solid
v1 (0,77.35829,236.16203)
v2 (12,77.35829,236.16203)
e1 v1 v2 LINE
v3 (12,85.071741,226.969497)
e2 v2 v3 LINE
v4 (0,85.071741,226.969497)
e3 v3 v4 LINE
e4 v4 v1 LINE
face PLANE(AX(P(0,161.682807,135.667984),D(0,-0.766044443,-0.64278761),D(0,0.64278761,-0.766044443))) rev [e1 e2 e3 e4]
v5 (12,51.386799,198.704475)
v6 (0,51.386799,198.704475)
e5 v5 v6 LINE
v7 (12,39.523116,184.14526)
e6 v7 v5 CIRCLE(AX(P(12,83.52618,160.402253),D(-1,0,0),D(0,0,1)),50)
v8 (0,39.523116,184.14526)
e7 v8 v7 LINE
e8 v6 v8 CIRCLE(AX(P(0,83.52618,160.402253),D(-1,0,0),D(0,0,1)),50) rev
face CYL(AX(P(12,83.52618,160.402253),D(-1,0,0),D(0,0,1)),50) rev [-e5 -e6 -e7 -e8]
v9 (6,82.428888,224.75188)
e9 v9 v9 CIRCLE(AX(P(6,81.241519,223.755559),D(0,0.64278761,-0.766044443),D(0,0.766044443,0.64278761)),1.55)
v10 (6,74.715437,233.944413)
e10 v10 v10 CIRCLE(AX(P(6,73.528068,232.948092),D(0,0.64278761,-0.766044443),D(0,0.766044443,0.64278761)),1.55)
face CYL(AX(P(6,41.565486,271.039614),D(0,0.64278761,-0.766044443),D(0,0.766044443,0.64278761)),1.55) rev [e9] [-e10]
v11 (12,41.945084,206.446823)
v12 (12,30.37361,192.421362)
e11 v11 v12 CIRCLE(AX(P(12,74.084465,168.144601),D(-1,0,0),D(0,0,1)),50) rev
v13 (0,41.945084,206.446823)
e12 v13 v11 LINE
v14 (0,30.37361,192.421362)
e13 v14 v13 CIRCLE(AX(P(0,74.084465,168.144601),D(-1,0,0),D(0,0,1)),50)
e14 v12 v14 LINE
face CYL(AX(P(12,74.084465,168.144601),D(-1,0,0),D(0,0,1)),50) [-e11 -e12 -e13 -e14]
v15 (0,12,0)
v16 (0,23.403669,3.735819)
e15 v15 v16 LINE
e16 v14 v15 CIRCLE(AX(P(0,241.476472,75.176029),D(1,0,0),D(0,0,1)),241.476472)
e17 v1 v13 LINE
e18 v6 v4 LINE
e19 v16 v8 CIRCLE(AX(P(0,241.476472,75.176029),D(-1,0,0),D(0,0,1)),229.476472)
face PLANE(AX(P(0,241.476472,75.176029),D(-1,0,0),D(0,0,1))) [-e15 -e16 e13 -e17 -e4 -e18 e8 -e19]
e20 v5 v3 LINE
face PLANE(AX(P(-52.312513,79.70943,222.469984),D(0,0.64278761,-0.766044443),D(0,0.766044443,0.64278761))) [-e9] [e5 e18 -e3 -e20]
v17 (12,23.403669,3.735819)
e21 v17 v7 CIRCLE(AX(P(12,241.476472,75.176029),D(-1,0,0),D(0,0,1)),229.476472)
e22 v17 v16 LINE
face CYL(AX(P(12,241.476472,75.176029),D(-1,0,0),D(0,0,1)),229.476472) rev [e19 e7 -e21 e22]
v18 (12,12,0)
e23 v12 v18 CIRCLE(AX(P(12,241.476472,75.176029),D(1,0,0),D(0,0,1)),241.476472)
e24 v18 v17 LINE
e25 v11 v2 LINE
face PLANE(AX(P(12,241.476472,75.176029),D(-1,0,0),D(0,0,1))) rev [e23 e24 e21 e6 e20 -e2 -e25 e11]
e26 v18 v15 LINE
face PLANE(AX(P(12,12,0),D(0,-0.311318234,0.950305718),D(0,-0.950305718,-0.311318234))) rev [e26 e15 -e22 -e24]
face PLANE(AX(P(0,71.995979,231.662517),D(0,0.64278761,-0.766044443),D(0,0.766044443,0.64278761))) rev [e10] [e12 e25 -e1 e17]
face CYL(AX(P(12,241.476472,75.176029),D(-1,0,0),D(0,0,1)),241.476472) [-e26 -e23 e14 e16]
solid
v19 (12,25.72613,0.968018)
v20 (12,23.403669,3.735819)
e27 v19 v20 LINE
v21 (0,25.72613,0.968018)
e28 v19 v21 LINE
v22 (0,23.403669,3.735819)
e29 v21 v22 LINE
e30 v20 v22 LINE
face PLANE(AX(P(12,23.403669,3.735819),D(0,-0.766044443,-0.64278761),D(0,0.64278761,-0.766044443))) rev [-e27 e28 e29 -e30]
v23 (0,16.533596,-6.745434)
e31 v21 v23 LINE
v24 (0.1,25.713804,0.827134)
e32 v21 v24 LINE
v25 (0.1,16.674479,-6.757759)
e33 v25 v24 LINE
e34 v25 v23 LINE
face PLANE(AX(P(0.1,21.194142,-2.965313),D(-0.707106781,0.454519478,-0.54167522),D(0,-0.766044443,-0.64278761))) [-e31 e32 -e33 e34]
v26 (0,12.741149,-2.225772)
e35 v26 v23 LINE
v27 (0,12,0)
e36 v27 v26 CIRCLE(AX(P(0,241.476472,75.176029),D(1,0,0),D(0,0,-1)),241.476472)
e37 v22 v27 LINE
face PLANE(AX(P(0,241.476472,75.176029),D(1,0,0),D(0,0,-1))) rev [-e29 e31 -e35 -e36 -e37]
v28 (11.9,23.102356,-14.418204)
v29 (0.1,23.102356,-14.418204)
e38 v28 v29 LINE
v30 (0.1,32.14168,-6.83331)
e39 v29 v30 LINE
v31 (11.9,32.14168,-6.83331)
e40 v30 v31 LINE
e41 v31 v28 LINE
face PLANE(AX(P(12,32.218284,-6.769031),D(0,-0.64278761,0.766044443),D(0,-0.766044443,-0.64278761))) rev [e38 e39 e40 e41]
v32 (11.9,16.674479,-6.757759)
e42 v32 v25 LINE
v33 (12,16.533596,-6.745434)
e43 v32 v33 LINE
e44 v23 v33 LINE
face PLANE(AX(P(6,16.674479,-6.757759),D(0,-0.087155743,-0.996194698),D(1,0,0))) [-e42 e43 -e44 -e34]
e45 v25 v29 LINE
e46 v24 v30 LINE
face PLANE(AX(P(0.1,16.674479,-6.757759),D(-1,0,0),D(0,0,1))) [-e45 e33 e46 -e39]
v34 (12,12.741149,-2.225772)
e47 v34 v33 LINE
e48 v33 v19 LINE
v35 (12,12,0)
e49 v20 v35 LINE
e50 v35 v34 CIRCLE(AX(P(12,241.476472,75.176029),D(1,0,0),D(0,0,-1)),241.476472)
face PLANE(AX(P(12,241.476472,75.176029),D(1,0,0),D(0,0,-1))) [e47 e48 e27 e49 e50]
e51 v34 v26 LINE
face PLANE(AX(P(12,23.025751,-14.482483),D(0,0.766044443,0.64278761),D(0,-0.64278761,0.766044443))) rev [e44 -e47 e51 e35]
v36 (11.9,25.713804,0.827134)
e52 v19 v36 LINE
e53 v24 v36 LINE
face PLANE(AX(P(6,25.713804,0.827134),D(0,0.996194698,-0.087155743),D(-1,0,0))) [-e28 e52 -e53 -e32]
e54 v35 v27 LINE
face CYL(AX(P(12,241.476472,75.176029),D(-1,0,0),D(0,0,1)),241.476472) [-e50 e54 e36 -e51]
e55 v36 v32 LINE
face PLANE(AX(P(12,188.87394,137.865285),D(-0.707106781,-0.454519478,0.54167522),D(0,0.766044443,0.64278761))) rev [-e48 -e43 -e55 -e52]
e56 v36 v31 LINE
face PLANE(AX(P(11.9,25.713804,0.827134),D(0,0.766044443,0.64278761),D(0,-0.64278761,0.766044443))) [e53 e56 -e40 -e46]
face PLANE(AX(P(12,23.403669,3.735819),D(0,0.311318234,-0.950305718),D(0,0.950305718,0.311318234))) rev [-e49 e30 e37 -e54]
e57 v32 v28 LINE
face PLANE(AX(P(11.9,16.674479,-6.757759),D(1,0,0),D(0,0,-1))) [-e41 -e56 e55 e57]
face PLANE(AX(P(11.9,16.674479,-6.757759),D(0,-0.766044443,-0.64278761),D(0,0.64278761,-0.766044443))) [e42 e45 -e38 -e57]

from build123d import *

# Parameters (mm, degrees)
AUFSATZ_LINEAR_AUSTRAGEN1_DEPTH = 12
AUFSATZ_LINEAR_AUSTRAGEN3_DEPTH = 12
AUFSATZ_LINEAR_AUSTRAGEN4_DEPTH = 12
SCHNITT_LINEAR_AUSTRAGEN1_DEPTH = 254.175024926
VERRUNDUNG1_R                   = 50
SKIZZE9_W                       = 12
SKIZZE9_H                       = 12
AUFSATZ_LINEAR_AUSTRAGEN6_DEPTH = 7
SKIZZE10_R                      = 9.036348878
SKIZZE10_W                      = 11.8
SKIZZE10_H                      = 11.8
SCHNITT_LINEAR_AUSTRAGEN3_DEPTH = 10
SKIZZE11_R                      = 1.55
SCHNITT_LINEAR_AUSTRAGEN4_DEPTH = 218.416419828
FASE1_SIZE                      = 0.1


with BuildPart() as part:
    # Skizze1 → Aufsatz-Linear austragen1 (new body)
    with BuildSketch(Plane(origin=(0, 0, 0), x_dir=(0, 0, -1), z_dir=(1, 0, 0))):
        with BuildLine():
            Line((-240, 65), (-230.735708163, 72.773663864))
            ThreePointArc((-230.735708163, 72.773663864), (-123.944567763, 17.242039243), (-3.735818811, 23.403668612))
            Line((-3.735818811, 23.403668612), (0, 12))
            ThreePointArc((0, 12), (-127.247502729, 5.681119716), (-240, 65))
        make_face()
    extrude(amount=AUFSATZ_LINEAR_AUSTRAGEN1_DEPTH)

    # Skizze5 → Aufsatz-Linear austragen4 (add)
    with BuildSketch(Plane(origin=(12, 0, 0), x_dir=(0, 0, -1), z_dir=(1, 0, 0))):
        Polygon((-231.662517154, 71.995978781), (-222.469983836, 79.709430098), (-210.899806862, 65.920630121), (-192.948331238, 44.526894555), (-220.092340179, 58.207178805), align=None)
    extrude(amount=-AUFSATZ_LINEAR_AUSTRAGEN4_DEPTH)

    # Skizze6 → Schnitt-Linear austragen1 (cut, through all)
    with BuildSketch(Plane(origin=(12, 0, 0), x_dir=(0, 0, -1), z_dir=(1, 0, 0))):
        Polygon((-231.662517154, 71.995978781), (-199.510648028, 33.678873242), (-204.367668784, 29.603348917), (-240, 65), align=None)
    extrude(amount=-SCHNITT_LINEAR_AUSTRAGEN1_DEPTH, mode=Mode.SUBTRACT)

    # Verrundung1
    verrundung1_edges = [part.edges().sort_by_distance(p)[0] for p in [
        (6, 44.526894555, 192.948331238),
        (6, 35.285406895, 200.858689823),
    ]]
    fillet(verrundung1_edges, radius=VERRUNDUNG1_R)

    # Skizze9 → Aufsatz-Linear austragen6 (add)
    with BuildSketch(Plane(origin=(0, 156.320496136, 131.168470653), x_dir=(1, 0, 0), z_dir=(0, 0.7660444431189836, 0.6427876096865328))):
        with Locations((6, -125.185660837)):
            Rectangle(SKIZZE9_W, SKIZZE9_H)
    extrude(amount=AUFSATZ_LINEAR_AUSTRAGEN6_DEPTH)

    # Skizze11 → Schnitt-Linear austragen4 (cut, through all)
    with BuildSketch(Plane(origin=(0, -76.611066038, 91.301513183), x_dir=(-1, 0, 0), z_dir=(0, 0.6427876096865329, -0.7660444431189836))):
        with Locations(Location((-6, 206.061915128, 0), (0, 0, 90))):
            Circle(SKIZZE11_R)
    extrude(amount=-SCHNITT_LINEAR_AUSTRAGEN4_DEPTH, mode=Mode.SUBTRACT)


with BuildPart() as body_2:
    # Skizze4 → Aufsatz-Linear austragen3 (new body)
    with BuildSketch(Plane(origin=(0, 0, 0), x_dir=(0, 0, -1), z_dir=(1, 0, 0))):
        with BuildLine():
            Line((-3.735818811, 23.403668612), (6.769031275, 32.218284445))
            Line((6.769031275, 32.218284445), (14.482482591, 23.025751128))
            Line((14.482482591, 23.025751128), (2.225771501, 12.741149373))
            ThreePointArc((2.225771501, 12.741149373), (1.113785782, 12.367871772), (0, 12))
            Line((0, 12), (-3.735818811, 23.403668612))
        make_face()
    extrude(amount=AUFSATZ_LINEAR_AUSTRAGEN3_DEPTH)

    # Skizze10 → Schnitt-Linear austragen3 (cut)
    with BuildSketch(Plane(origin=(0, 16.644916272, -19.836638765), x_dir=(-1, 0, 0), z_dir=(0, 0.6427876096865353, -0.7660444431189815))):
        with Locations((-6, 14.329588333)):
            Circle(SKIZZE10_R)
        with Locations((-6, 14.329588333)):
            Rectangle(SKIZZE10_W, SKIZZE10_H, mode=Mode.SUBTRACT)
    extrude(amount=-SCHNITT_LINEAR_AUSTRAGEN3_DEPTH, mode=Mode.SUBTRACT)

    # Fase1
    fase1_edges = [body_2.edges().sort_by_distance(p)[0] for p in [
        (0, 21.194141689, -2.965312502),
        (6, 16.597875031, -6.82203816),
        (6, 25.790408348, 0.891413156),
        (12, 21.194141689, -2.965312502),
    ]]
    chamfer(fase1_edges, length=FASE1_SIZE - 0.0001)  # a hair under: the kernel refuses the full size


solid = Compound([part.part, body_2.part])
